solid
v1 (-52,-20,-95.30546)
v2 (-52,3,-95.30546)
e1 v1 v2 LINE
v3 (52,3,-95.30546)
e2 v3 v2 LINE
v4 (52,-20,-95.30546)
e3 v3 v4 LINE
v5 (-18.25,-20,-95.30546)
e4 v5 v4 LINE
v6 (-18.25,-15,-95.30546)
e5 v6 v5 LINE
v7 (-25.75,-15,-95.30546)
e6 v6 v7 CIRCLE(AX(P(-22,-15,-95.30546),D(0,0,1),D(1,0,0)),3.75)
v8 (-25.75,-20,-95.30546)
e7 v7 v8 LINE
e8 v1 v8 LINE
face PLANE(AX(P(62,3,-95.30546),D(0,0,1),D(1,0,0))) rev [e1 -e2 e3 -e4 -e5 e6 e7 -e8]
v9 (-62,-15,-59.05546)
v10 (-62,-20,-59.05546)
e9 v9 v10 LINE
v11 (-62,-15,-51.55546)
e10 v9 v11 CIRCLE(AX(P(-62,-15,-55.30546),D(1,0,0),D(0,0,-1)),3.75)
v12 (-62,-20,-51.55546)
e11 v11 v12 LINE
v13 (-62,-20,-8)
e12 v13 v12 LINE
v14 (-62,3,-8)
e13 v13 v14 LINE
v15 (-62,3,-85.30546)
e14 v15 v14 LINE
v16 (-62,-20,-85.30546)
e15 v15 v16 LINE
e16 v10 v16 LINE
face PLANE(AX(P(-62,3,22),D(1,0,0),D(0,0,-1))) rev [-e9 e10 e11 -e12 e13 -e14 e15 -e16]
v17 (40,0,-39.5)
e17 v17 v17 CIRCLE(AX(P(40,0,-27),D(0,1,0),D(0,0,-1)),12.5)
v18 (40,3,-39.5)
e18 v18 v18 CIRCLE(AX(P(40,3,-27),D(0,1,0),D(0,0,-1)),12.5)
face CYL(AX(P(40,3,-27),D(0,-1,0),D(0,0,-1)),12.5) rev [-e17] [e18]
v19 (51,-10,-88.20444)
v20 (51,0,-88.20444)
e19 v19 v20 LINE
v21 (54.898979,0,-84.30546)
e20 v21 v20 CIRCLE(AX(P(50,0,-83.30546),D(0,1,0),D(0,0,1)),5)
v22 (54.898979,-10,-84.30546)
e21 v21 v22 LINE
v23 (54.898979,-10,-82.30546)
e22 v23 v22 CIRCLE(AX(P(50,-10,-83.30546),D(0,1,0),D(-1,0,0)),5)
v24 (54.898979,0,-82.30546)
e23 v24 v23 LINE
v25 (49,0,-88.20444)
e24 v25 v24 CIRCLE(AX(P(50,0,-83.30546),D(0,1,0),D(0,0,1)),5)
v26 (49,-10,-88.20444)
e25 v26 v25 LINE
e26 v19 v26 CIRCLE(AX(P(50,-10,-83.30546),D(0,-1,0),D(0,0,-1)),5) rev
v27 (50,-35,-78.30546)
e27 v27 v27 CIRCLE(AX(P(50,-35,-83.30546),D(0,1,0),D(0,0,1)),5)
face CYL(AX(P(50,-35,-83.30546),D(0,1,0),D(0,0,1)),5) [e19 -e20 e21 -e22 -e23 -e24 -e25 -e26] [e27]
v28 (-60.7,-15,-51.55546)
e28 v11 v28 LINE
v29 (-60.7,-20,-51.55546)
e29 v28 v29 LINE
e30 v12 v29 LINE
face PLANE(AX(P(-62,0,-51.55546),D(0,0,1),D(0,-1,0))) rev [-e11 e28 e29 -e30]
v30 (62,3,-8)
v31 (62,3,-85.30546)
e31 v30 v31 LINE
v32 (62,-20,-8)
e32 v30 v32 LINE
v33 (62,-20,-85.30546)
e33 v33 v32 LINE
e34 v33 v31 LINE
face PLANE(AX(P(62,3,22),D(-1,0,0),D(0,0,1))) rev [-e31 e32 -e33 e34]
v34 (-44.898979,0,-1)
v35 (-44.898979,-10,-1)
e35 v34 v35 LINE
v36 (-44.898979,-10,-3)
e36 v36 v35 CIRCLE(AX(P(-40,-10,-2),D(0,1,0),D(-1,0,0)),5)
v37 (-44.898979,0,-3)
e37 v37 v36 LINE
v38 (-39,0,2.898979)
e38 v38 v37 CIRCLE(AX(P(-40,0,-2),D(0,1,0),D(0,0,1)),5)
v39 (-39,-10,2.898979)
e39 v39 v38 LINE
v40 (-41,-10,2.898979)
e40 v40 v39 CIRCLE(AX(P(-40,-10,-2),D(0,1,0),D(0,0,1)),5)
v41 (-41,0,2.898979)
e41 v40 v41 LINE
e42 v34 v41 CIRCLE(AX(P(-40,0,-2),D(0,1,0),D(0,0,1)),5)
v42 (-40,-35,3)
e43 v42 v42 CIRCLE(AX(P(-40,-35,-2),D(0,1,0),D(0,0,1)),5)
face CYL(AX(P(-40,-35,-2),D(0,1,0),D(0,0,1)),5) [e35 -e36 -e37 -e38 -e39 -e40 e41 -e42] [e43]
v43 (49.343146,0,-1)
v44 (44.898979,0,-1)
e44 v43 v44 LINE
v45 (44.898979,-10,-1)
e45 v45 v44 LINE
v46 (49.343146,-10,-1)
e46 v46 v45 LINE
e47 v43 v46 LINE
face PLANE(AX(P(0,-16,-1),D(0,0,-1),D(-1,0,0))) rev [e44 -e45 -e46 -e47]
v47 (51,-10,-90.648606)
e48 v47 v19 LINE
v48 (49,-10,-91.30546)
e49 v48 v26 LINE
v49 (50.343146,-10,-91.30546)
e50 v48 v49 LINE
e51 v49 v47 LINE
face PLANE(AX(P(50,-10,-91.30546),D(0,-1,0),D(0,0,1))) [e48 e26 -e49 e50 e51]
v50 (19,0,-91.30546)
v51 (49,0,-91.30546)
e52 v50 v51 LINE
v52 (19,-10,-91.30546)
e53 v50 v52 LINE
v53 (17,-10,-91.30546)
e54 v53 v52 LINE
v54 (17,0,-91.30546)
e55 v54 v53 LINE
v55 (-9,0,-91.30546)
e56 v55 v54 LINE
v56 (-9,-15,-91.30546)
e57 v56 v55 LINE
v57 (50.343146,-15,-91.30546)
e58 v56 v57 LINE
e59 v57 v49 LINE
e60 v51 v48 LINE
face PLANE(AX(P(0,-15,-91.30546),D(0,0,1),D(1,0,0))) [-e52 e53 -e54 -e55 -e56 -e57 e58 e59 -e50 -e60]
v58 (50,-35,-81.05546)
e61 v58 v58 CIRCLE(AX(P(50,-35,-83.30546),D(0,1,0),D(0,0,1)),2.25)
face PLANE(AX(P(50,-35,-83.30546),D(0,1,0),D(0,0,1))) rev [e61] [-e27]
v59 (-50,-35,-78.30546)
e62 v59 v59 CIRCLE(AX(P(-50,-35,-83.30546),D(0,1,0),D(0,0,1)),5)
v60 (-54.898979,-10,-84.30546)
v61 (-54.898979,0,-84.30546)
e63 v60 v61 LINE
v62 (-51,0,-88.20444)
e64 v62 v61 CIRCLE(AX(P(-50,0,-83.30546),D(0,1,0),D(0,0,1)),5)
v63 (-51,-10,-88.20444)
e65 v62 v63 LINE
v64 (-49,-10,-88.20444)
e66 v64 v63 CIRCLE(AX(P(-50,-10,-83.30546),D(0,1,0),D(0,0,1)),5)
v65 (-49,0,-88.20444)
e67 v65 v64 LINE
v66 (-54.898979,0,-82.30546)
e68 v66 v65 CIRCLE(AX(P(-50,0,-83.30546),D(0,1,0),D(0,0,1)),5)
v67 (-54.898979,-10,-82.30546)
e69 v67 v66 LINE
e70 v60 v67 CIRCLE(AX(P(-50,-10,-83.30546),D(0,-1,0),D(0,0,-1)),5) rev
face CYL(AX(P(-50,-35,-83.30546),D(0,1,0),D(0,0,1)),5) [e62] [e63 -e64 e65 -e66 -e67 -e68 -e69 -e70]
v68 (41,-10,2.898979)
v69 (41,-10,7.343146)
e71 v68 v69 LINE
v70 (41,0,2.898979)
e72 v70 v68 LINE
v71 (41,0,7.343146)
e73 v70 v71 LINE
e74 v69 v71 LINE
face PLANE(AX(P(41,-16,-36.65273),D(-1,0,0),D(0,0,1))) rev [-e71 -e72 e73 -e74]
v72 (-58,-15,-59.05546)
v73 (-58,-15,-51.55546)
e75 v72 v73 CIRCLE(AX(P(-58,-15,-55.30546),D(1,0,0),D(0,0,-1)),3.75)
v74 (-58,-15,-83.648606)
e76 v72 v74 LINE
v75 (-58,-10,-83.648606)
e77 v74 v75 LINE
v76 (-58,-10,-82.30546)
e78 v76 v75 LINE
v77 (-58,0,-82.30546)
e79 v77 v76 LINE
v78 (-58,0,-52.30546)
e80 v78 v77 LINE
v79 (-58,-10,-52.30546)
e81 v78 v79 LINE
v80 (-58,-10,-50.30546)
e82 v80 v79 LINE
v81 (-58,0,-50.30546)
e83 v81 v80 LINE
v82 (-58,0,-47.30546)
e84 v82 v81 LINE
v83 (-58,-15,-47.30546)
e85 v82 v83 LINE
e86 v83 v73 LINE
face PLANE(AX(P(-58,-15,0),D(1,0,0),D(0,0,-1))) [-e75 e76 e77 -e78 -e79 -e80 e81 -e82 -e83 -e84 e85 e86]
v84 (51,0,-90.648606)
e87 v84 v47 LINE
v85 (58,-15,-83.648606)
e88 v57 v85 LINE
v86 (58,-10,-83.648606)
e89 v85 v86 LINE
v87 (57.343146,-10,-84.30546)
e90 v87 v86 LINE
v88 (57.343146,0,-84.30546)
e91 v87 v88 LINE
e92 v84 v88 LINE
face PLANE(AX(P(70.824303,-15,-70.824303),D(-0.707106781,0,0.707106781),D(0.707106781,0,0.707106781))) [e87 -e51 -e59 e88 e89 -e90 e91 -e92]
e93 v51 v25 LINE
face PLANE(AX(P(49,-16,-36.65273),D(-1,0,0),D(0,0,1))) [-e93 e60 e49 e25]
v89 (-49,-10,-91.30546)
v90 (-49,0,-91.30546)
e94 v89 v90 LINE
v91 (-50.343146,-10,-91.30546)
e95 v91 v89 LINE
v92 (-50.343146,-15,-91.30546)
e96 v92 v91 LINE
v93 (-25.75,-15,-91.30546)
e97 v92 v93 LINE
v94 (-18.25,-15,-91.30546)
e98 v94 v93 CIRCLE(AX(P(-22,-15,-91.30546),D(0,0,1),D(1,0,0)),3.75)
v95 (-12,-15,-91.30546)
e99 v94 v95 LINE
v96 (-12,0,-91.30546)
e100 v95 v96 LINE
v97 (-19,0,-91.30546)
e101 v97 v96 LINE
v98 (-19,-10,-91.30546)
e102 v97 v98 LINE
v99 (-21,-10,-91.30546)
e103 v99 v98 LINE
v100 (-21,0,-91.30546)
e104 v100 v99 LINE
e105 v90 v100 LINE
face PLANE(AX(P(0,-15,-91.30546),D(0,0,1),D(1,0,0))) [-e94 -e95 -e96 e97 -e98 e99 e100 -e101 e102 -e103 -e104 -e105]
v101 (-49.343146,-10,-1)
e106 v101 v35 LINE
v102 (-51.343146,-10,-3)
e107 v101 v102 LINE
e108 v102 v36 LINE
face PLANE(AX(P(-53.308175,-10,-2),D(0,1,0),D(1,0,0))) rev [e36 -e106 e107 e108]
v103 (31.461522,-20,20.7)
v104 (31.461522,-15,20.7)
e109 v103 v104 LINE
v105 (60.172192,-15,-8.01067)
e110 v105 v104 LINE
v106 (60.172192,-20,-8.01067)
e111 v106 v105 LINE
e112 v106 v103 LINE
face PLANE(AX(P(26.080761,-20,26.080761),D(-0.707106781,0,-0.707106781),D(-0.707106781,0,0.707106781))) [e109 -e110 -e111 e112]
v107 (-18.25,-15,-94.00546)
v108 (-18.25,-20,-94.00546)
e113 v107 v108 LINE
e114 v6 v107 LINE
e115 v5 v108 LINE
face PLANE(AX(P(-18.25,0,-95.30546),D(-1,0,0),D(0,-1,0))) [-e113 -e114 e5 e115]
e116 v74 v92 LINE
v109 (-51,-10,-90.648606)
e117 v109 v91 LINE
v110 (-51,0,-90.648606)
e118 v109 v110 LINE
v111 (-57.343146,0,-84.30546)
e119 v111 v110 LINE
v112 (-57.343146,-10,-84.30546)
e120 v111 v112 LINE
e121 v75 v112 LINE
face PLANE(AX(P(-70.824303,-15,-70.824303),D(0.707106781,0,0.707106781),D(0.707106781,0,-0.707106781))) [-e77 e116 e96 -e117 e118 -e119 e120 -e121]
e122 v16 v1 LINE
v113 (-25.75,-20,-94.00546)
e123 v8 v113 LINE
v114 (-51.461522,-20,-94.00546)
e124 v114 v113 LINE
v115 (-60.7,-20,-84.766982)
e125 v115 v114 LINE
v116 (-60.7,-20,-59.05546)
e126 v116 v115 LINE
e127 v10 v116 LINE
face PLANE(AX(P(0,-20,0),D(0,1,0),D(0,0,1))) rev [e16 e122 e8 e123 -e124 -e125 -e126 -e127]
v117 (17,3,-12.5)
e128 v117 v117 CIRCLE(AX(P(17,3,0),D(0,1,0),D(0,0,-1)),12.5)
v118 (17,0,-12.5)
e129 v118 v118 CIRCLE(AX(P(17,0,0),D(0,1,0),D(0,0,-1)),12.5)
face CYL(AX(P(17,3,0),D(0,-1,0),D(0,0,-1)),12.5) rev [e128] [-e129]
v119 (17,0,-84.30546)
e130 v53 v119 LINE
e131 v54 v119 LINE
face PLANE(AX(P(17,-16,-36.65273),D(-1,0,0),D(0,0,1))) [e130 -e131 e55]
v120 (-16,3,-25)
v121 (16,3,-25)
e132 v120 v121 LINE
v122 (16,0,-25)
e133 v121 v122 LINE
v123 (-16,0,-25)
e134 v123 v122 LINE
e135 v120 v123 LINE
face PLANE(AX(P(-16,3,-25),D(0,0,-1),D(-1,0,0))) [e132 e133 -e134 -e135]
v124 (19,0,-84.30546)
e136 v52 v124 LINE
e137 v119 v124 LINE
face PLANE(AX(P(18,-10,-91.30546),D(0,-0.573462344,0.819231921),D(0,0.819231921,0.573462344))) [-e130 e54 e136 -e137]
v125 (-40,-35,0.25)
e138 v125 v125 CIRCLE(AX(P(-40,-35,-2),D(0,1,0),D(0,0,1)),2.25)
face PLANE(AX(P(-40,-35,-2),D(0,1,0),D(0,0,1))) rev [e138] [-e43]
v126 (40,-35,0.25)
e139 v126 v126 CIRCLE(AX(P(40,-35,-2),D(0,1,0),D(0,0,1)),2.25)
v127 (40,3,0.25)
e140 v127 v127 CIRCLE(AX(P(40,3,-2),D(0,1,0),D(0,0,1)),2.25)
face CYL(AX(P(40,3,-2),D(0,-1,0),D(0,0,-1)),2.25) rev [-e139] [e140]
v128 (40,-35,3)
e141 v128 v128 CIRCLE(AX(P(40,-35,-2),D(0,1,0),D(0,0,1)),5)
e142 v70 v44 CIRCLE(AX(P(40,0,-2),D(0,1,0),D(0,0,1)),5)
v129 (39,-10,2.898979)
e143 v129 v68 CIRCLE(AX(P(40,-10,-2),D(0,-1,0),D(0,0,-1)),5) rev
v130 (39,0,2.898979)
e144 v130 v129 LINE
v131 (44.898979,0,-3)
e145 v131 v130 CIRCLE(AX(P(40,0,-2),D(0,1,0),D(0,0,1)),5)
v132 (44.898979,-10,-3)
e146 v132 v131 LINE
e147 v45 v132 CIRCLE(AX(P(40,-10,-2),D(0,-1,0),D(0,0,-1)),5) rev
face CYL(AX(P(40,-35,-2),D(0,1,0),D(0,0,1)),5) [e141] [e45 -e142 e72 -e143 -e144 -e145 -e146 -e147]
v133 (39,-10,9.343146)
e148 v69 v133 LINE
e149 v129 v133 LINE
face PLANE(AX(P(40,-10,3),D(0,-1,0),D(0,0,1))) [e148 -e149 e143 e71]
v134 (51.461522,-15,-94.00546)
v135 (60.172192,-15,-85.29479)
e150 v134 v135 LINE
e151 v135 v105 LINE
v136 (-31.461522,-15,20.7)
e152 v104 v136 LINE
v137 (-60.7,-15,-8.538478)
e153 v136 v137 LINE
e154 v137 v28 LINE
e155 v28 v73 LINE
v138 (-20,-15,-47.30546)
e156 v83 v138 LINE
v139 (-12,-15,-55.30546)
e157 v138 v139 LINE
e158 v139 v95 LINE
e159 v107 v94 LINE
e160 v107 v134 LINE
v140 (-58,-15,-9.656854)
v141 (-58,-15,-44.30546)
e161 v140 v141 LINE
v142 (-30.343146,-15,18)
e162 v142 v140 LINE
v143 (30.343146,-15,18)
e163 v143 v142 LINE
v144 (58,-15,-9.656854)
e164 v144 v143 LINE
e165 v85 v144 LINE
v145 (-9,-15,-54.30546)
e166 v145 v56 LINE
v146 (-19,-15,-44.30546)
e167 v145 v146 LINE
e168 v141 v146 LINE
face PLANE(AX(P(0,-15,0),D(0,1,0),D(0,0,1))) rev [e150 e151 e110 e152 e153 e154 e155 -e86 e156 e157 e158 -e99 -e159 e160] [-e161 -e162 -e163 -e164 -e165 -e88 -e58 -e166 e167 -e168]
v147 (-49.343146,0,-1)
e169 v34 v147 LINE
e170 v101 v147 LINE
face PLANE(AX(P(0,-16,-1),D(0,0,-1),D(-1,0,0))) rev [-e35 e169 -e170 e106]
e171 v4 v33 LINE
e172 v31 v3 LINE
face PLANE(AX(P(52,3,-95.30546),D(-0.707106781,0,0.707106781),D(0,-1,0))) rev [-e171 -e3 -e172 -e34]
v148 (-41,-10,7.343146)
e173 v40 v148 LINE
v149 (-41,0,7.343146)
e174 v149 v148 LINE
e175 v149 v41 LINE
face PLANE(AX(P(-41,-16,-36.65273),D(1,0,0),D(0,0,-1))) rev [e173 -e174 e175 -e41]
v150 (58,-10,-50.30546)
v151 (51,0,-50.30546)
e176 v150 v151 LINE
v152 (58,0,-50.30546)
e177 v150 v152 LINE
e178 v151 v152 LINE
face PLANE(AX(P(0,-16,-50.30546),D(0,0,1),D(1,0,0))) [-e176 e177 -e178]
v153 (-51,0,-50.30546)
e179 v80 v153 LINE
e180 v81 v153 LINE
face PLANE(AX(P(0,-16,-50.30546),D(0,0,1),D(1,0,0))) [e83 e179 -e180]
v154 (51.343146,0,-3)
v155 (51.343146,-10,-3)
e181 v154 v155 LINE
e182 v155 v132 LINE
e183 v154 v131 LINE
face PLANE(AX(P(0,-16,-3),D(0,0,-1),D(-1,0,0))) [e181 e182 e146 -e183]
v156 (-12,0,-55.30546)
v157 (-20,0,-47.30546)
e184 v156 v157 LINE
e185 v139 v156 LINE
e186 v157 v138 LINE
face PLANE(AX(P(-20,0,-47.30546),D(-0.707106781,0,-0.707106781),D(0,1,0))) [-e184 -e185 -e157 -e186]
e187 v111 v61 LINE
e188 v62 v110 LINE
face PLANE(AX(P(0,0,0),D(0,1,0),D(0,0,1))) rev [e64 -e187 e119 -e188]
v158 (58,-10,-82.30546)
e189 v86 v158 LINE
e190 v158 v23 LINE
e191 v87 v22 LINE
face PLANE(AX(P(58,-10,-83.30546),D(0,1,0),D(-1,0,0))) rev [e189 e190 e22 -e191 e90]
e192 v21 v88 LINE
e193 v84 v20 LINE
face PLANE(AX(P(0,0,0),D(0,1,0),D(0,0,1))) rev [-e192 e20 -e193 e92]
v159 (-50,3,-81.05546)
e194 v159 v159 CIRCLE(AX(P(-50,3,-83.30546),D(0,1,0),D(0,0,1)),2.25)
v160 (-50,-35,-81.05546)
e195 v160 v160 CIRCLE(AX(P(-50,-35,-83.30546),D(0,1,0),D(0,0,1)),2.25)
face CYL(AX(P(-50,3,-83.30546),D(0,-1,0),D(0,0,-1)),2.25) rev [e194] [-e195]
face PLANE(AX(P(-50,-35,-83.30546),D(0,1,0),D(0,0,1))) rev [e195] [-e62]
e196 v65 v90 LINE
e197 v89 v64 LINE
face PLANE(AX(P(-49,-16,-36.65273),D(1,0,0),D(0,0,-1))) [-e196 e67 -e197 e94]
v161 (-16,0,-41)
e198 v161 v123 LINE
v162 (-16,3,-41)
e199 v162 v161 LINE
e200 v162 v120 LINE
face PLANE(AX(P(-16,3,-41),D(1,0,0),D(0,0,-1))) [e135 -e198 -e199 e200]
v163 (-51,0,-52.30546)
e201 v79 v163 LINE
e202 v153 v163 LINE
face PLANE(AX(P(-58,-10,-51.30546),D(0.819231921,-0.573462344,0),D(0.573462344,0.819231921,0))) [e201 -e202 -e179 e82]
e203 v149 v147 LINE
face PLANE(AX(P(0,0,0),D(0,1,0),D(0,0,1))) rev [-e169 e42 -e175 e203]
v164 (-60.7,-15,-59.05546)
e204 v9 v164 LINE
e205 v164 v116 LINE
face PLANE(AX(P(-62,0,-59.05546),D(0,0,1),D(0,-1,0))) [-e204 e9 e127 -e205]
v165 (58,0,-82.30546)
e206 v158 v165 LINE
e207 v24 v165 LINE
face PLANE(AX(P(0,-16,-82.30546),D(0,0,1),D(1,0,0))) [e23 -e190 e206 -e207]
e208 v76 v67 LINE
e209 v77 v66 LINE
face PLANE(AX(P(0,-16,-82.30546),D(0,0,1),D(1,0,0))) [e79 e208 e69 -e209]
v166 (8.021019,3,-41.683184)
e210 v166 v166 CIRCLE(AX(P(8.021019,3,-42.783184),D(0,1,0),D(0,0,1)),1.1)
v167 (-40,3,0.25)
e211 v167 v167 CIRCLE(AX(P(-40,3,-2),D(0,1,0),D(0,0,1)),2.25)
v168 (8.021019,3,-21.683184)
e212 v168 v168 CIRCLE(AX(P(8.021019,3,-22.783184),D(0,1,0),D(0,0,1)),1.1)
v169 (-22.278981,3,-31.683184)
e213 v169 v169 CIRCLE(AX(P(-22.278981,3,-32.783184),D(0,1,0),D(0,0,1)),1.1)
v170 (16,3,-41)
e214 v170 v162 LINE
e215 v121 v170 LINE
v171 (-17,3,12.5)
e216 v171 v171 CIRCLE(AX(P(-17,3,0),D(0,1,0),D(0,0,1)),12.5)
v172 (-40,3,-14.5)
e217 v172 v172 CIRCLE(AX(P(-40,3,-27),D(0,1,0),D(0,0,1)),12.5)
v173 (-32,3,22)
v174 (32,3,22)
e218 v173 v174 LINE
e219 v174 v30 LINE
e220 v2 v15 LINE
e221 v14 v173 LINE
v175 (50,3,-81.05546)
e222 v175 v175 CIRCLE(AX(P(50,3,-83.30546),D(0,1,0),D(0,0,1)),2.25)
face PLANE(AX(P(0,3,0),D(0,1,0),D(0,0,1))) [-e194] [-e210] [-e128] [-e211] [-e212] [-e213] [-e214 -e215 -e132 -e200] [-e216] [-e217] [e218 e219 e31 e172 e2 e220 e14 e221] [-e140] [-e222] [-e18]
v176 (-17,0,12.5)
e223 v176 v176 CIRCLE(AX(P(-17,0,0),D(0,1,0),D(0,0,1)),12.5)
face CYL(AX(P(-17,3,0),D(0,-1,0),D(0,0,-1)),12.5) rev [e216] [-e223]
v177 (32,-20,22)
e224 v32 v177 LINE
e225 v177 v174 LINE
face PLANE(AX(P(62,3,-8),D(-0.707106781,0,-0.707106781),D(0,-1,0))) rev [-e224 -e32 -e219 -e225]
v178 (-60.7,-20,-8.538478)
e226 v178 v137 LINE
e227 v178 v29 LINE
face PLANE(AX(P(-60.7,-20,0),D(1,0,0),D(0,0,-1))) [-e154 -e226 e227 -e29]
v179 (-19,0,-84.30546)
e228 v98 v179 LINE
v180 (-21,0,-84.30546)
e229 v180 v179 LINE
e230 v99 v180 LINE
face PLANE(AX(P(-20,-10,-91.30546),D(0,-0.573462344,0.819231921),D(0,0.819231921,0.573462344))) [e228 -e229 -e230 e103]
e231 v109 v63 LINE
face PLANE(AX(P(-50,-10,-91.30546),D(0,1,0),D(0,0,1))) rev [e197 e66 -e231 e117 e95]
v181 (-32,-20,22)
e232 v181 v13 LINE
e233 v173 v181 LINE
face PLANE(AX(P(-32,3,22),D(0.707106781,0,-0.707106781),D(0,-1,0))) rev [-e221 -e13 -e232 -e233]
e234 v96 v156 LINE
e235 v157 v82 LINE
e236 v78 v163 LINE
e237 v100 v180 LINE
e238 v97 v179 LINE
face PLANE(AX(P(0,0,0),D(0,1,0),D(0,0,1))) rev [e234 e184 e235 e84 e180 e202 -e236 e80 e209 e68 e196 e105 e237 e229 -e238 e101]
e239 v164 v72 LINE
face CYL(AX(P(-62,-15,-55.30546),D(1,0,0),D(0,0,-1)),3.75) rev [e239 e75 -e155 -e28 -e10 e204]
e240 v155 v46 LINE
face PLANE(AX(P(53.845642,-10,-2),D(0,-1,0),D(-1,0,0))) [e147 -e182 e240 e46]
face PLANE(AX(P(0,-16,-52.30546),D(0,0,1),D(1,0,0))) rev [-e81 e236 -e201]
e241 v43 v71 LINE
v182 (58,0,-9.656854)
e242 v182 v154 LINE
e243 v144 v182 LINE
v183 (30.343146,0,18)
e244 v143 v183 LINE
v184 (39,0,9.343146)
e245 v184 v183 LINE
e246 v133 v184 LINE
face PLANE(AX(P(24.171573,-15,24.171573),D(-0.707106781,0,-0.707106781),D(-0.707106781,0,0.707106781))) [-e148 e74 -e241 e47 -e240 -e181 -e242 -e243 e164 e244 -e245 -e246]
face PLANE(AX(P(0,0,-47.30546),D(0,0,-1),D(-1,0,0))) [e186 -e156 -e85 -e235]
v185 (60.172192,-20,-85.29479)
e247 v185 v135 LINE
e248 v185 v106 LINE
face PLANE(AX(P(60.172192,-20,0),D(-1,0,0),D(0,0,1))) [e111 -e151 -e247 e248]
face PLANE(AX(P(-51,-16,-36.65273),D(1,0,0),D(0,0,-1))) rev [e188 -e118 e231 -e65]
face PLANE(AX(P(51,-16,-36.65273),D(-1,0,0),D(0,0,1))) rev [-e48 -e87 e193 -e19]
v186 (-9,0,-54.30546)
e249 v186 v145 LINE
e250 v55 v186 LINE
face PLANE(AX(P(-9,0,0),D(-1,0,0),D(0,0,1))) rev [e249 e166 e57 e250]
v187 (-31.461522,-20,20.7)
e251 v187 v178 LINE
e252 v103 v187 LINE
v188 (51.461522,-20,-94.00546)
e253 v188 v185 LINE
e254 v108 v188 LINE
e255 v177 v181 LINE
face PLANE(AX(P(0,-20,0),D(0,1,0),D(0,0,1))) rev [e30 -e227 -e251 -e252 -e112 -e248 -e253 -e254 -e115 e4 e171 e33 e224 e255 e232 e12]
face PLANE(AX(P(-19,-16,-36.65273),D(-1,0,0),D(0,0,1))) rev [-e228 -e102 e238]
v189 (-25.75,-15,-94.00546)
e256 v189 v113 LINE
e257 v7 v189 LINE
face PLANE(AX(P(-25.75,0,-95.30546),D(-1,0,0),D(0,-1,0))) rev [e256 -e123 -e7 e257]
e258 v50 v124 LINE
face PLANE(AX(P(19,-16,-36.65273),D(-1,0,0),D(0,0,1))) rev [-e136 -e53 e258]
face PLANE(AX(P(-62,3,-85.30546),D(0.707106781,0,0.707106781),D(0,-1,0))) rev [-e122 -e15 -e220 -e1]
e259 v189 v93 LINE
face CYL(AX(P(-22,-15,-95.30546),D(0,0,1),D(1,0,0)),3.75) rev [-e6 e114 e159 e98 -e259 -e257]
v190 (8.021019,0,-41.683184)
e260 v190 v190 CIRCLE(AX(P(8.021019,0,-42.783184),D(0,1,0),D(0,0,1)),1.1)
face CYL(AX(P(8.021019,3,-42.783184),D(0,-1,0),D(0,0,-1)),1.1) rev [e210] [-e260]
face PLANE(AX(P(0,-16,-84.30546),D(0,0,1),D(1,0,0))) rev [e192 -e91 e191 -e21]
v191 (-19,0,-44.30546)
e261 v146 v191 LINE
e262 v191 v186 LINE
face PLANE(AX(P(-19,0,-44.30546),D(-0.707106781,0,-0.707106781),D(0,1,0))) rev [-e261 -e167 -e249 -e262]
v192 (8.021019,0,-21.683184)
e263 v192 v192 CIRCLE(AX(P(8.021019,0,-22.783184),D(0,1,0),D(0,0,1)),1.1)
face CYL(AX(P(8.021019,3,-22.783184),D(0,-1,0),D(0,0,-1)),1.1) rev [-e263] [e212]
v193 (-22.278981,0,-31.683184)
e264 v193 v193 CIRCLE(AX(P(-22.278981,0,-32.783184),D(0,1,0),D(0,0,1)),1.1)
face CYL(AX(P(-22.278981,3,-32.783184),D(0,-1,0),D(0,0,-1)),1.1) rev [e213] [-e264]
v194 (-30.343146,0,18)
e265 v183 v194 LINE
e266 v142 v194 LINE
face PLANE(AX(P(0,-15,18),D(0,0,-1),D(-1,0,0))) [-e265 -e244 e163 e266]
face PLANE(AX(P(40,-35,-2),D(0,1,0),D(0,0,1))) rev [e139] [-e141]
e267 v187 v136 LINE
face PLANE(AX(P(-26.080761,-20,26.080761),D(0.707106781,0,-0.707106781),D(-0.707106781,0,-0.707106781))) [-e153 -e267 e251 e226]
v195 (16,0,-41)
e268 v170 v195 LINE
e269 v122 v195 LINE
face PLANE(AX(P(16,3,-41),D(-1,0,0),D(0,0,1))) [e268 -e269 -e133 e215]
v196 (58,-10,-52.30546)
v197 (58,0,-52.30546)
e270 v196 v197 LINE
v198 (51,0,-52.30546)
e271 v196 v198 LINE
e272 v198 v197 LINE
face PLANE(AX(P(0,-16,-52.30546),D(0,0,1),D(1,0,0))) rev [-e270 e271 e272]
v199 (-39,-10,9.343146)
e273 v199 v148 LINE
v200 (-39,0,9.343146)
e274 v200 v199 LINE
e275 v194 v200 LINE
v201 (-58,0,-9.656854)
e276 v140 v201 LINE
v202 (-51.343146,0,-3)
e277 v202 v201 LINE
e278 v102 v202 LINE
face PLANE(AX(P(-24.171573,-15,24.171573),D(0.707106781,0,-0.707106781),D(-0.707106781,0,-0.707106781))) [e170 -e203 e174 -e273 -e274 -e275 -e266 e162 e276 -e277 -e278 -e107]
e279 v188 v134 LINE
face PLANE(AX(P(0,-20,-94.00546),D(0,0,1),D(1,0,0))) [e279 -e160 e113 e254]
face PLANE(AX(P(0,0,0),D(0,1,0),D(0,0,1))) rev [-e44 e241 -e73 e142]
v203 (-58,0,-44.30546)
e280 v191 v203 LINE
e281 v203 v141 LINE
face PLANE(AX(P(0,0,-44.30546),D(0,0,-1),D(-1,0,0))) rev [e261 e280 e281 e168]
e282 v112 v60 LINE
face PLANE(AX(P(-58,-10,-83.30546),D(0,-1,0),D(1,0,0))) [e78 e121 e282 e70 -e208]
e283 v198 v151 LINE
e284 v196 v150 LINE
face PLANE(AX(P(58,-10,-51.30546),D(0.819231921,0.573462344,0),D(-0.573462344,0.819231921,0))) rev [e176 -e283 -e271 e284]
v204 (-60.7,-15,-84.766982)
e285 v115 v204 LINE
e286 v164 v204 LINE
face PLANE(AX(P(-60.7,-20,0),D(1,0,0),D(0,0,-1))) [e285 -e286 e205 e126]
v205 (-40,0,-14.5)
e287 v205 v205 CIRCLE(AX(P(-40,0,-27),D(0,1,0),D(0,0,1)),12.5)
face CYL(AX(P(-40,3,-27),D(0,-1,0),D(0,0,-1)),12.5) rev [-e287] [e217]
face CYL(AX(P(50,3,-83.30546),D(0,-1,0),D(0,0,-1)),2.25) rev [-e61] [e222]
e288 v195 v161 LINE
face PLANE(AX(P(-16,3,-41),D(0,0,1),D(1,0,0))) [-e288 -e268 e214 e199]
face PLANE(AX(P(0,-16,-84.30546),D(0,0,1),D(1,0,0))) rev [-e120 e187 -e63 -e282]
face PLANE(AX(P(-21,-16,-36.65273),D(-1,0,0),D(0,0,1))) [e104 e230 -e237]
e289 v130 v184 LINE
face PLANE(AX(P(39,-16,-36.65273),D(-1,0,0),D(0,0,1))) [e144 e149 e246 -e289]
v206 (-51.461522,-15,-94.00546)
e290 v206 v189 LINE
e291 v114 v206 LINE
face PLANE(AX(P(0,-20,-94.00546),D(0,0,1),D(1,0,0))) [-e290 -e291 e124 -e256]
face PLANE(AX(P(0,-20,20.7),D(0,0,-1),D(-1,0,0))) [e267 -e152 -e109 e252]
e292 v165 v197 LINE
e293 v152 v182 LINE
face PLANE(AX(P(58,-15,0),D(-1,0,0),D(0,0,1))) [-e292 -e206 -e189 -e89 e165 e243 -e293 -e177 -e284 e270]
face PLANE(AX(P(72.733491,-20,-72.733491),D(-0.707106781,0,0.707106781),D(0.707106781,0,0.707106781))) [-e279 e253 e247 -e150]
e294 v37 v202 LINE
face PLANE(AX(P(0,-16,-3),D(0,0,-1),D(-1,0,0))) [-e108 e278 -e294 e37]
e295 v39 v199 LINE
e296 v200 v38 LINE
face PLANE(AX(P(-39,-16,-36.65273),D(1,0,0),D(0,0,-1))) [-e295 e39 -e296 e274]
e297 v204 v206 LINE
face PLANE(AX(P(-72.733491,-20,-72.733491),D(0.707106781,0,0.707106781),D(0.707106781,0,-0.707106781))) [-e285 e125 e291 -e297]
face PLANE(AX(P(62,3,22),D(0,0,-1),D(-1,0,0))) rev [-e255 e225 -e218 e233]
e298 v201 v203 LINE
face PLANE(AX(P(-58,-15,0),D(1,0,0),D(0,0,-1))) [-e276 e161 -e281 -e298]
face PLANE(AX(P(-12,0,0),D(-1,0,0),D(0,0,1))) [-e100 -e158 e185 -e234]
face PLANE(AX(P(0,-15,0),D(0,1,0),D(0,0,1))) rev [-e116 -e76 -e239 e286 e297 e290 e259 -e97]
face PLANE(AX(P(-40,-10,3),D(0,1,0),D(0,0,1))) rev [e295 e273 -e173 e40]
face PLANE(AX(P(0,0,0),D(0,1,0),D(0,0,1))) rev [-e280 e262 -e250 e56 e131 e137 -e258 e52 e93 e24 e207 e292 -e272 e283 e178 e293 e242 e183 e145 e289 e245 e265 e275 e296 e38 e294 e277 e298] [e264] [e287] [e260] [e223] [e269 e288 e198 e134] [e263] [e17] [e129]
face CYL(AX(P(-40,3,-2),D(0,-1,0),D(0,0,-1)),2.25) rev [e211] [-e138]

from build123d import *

# Parameters (mm, degrees)
ESQUISSE1_W             = 124
ESQUISSE1_H             = 117.305460094
ESQUISSE1_R             = 12.5
ESQUISSE1_W_2           = 32
ESQUISSE1_H_2           = 16
BOSS_EXTRU_1_DEPTH      = 3
ESQUISSE3_R             = 1.1
ENL_V_MAT_EXTRU_1_DEPTH = 114.737112341
CHANFREIN1_SIZE         = 30
CHANFREIN2_SIZE         = 10
ESQUISSE4_R             = 2.25
ENL_V_MAT_EXTRU_2_DEPTH = 114.737112341
BOSS_EXTRU_2_START      = -35
ESQUISSE4_3_R           = 5
ESQUISSE4_3_R_2         = 2.25
BOSS_EXTRU_2_DEPTH      = 35
BOSS_EXTRU_3_DEPTH      = 20
BOSS_EXTRU_4_DEPTH      = 15
ENL_V_MAT_EXTRU_4_DEPTH = 119.962728296
ENL_V_MAT_EXTRU_6_DEPTH = 119.962728296
NERVURE1_REACH          = 131.26
ESQUISSE8_WALL_W        = 272.726425054
ESQUISSE8_WALL_H        = 2
NERVURE2_REACH          = 132.507
ESQUISSE9_WALL_W        = 275.220966894
ESQUISSE9_WALL_H        = 2
NERVURE3_REACH          = 104.189
ESQUISSE10_WALL_W       = 218.585522044
ESQUISSE10_WALL_H       = 2
NERVURE4_REACH          = 104.189
ESQUISSE11_WALL_W       = 218.585522044
ESQUISSE11_WALL_H       = 2
NERVURE5_REACH          = 153.169
ESQUISSE12_WALL_W       = 307.338424442
ESQUISSE12_WALL_H       = 2
NERVURE6_REACH          = 129.115
ESQUISSE13_WALL_W       = 259.230131382
ESQUISSE13_WALL_H       = 2
NERVURE7_REACH          = 129.115
ESQUISSE14_WALL_W       = 259.230131382
ESQUISSE14_WALL_H       = 2
NERVURE8_REACH          = 153.169
ESQUISSE15_WALL_W       = 307.338424442
ESQUISSE15_WALL_H       = 2
NERVURE9_REACH          = 119.367
ESQUISSE16_WALL_W       = 245.04129034
ESQUISSE16_WALL_H       = 2
NERVURE11_REACH         = 119.367
ESQUISSE17_WALL_W       = 245.578757666
ESQUISSE17_WALL_H       = 2
NERVURE12_REACH         = 145.917
ESQUISSE18_WALL_W       = 295.356537138
ESQUISSE18_WALL_H       = 2
NERVURE13_REACH         = 145.917
ESQUISSE19_WALL_W       = 296.177339158
ESQUISSE19_WALL_H       = 2
BOSS_EXTRU_5_DEPTH      = 2
BOSS_EXTRU_5_DEPTH_BACK = 1
ESQUISSE20_W            = 45
ESQUISSE20_H            = 15
BOSS_EXTRU_6_DEPTH      = 2
BOSS_EXTRU_6_DEPTH_BACK = 1
ESQUISSE21_W            = 49
ESQUISSE21_H            = 15
CHANFREIN3_SIZE         = 8
CHANFREIN4_SIZE         = 10


with BuildPart() as part:
    # Esquisse1 → Boss.-Extru.1 (new body)
    with BuildSketch(Plane(origin=(0, 0, 0), x_dir=(1, 0, 0), z_dir=(0, 1, 0))):
        with Locations((0, 36.652730047)):
            Rectangle(ESQUISSE1_W, ESQUISSE1_H)
        with Locations((-40, 27)):
            Circle(ESQUISSE1_R, mode=Mode.SUBTRACT)
        with Locations((-17, 0)):
            Circle(ESQUISSE1_R, mode=Mode.SUBTRACT)
        with Locations((17, 0)):
            Circle(ESQUISSE1_R, mode=Mode.SUBTRACT)
        with Locations((40, 27)):
            Circle(ESQUISSE1_R, mode=Mode.SUBTRACT)
        with Locations((0, 33)):
            Rectangle(ESQUISSE1_W_2, ESQUISSE1_H_2, mode=Mode.SUBTRACT)
    extrude(amount=BOSS_EXTRU_1_DEPTH)

    # Esquisse3 → Enlèv. mat.-Extru.1 (cut, through all)
    with BuildSketch(Plane(origin=(0, 0, 0), x_dir=(1, 0, 0), z_dir=(0, 1, 0))):
        with Locations((8.021018959, 22.783184136)):
            Circle(ESQUISSE3_R)
        with Locations((-22.278981041, 32.783184136)):
            Circle(ESQUISSE3_R)
        with Locations((8.021018959, 42.783184136)):
            Circle(ESQUISSE3_R)
    extrude(amount=ENL_V_MAT_EXTRU_1_DEPTH, mode=Mode.SUBTRACT)

    # Chanfrein1
    chanfrein1_edges = [part.edges().sort_by_distance(p)[0] for p in [
        (-62, 1.5, 22),
        (62, 1.5, 22),
    ]]
    chamfer(chanfrein1_edges, length=CHANFREIN1_SIZE)

    # Chanfrein2
    chanfrein2_edges = [part.edges().sort_by_distance(p)[0] for p in [
        (62, 1.5, -95.305460094),
        (-62, 1.5, -95.305460094),
    ]]
    chamfer(chanfrein2_edges, length=CHANFREIN2_SIZE)

    # Esquisse4 → Enlèv. mat.-Extru.2 (cut, through all)
    with BuildSketch(Plane(origin=(0, 0, 0), x_dir=(1, 0, 0), z_dir=(0, 1, 0))):
        with Locations((-40, 2)):
            Circle(ESQUISSE4_R)
        with Locations((40, 2)):
            Circle(ESQUISSE4_R)
        with Locations((50, 83.305460094)):
            Circle(ESQUISSE4_R)
        with Locations((-50, 83.305460094)):
            Circle(ESQUISSE4_R)
    extrude(amount=ENL_V_MAT_EXTRU_2_DEPTH, mode=Mode.SUBTRACT)

    # Esquisse4<3> → Boss.-Extru.2 (add)
    # profile 1 of 4: a face of its own
    with BuildSketch(Plane(origin=(0, 0, 0), x_dir=(1, 0, 0), z_dir=(0, 1, 0)).offset(BOSS_EXTRU_2_START)):
        with Locations((-40, 2)):
            Circle(ESQUISSE4_3_R)
        with Locations((-40, 2)):
            Circle(ESQUISSE4_3_R_2, mode=Mode.SUBTRACT)
    # profile 2 of 4: a face of its own
    with BuildSketch(Plane(origin=(0, 0, 0), x_dir=(1, 0, 0), z_dir=(0, 1, 0)).offset(BOSS_EXTRU_2_START)):
        with Locations((40, 2)):
            Circle(ESQUISSE4_3_R)
        with Locations((40, 2)):
            Circle(ESQUISSE4_3_R_2, mode=Mode.SUBTRACT)
    # profile 3 of 4: a face of its own
    with BuildSketch(Plane(origin=(0, 0, 0), x_dir=(1, 0, 0), z_dir=(0, 1, 0)).offset(BOSS_EXTRU_2_START)):
        with Locations((50, 83.305460094)):
            Circle(ESQUISSE4_3_R)
        with Locations((50, 83.305460094)):
            Circle(ESQUISSE4_3_R_2, mode=Mode.SUBTRACT)
    # profile 4 of 4: a face of its own
    with BuildSketch(Plane(origin=(0, 0, 0), x_dir=(1, 0, 0), z_dir=(0, 1, 0)).offset(BOSS_EXTRU_2_START)):
        with Locations((-50, 83.305460094)):
            Circle(ESQUISSE4_3_R)
        with Locations((-50, 83.305460094)):
            Circle(ESQUISSE4_3_R_2, mode=Mode.SUBTRACT)
    extrude(amount=BOSS_EXTRU_2_DEPTH)

    # Esquisse5 → Boss.-Extru.3 (add)
    with BuildSketch(Plane(origin=(0, 0, 0), x_dir=(1, 0, 0), z_dir=(0, 1, 0))):
        Polygon((-52, 95.305460094), (-62, 85.305460094), (-62, 8), (-32, -22), (32, -22), (62, 8), (62, 85.305460094), (52, 95.305460094), align=None)
        Polygon((-60.7, 8.538477631), (-60.7, 84.766982462), (-51.461522369, 94.005460094), (51.461522369, 94.005460094), (60.172192098, 85.294790364), (60.172192098, 8.010669729), (31.461522369, -20.7), (-31.461522369, -20.7), align=None, mode=Mode.SUBTRACT)
    extrude(amount=-BOSS_EXTRU_3_DEPTH)

    # Esquisse5<3> → Boss.-Extru.4 (add)
    with BuildSketch(Plane(origin=(0, 0, 0), x_dir=(1, 0, 0), z_dir=(0, 1, 0))):
        Polygon((-51.461522369, 94.005460094), (-60.7, 84.766982462), (-60.7, 8.538477631), (-31.461522369, -20.7), (31.461522369, -20.7), (60.172192098, 8.010669729), (60.172192098, 85.294790364), (51.461522369, 94.005460094), align=None)
        Polygon((-58, 9.656854249), (-58, 83.648605844), (-50.343145751, 91.305460094), (50.343145751, 91.305460094), (58, 83.648605844), (58, 9.656854249), (30.343145751, -18), (-30.343145751, -18), align=None, mode=Mode.SUBTRACT)
    extrude(amount=-BOSS_EXTRU_4_DEPTH)

    # Esquisse6 → Enlèv. mat.-Extru.4 (cut, through all)
    with BuildSketch(Plane(origin=(0, 0, 0), x_dir=(0, 0, -1), z_dir=(1, 0, 0))):
        with BuildLine():
            Line((51.555460094, -20), (59.055460094, -20))
            Line((59.055460094, -20), (59.055460094, -15))
            ThreePointArc((59.055460094, -15), (55.305460094, -11.25), (51.555460094, -15))
            Line((51.555460094, -15), (51.555460094, -20))
        make_face()
    extrude(amount=-ENL_V_MAT_EXTRU_4_DEPTH, mode=Mode.SUBTRACT)

    # Esquisse7 → Enlèv. mat.-Extru.6 (cut, through all)
    with BuildSketch(Plane.XY):
        with BuildLine():
            ThreePointArc((-18.25, -15), (-22, -11.25), (-25.75, -15))
            Line((-25.75, -15), (-25.75, -20))
            Line((-25.75, -20), (-18.25, -20))
            Line((-18.25, -20), (-18.25, -15))
        make_face()
    extrude(amount=-ENL_V_MAT_EXTRU_6_DEPTH, mode=Mode.SUBTRACT)

    # Esquisse8 wall → Nervure1 (add, up to next)
    with BuildSketch(Plane(origin=(18, -5, -87.805460094), x_dir=(0, 0.819231920519, 0.573462344363), z_dir=(0, 0.573462344363, -0.819231920519)), mode=Mode.PRIVATE) as nervure1_sk1:
        Rectangle(ESQUISSE8_WALL_W, ESQUISSE8_WALL_H)
    nervure1_tool1 = extrude(nervure1_sk1.sketch, amount=NERVURE1_REACH, mode=Mode.PRIVATE) - part.part
    add(nervure1_tool1.solids().sort_by_distance((18, -5, -87.805460094))[0])

    # Esquisse9 wall → Nervure2 (add, up to next)
    with BuildSketch(Plane(origin=(-20, -5, -87.805460094), x_dir=(0, 0.819231920519, 0.573462344363), z_dir=(0, 0.573462344363, -0.819231920519)), mode=Mode.PRIVATE) as nervure2_sk1:
        Rectangle(ESQUISSE9_WALL_W, ESQUISSE9_WALL_H)
    nervure2_tool1 = extrude(nervure2_sk1.sketch, amount=NERVURE2_REACH, mode=Mode.PRIVATE) - part.part
    add(nervure2_tool1.solids().sort_by_distance((-20, -5, -87.805460094))[0])

    # Esquisse10 wall → Nervure3 (add, up to next)
    with BuildSketch(Plane(origin=(54.5, -5, -51.305460094), x_dir=(-0.573462344363, 0.819231920519, 0), z_dir=(-0.819231920519, -0.573462344363, 0)), mode=Mode.PRIVATE) as nervure3_sk1:
        Rectangle(ESQUISSE10_WALL_W, ESQUISSE10_WALL_H)
    nervure3_tool1 = extrude(nervure3_sk1.sketch, amount=-NERVURE3_REACH, mode=Mode.PRIVATE) - part.part
    add(nervure3_tool1.solids().sort_by_distance((54.5, -5, -51.305460094))[0])

    # Esquisse11 wall → Nervure4 (add, up to next)
    with BuildSketch(Plane(origin=(-54.5, -5, -51.305460094), x_dir=(0.573462344363, 0.819231920519, 0), z_dir=(-0.819231920519, 0.573462344363, 0)), mode=Mode.PRIVATE) as nervure4_sk1:
        Rectangle(ESQUISSE11_WALL_W, ESQUISSE11_WALL_H)
    nervure4_tool1 = extrude(nervure4_sk1.sketch, amount=NERVURE4_REACH, mode=Mode.PRIVATE) - part.part
    add(nervure4_tool1.solids().sort_by_distance((-54.5, -5, -51.305460094))[0])

    # Esquisse12 wall → Nervure5 (add, up to next)
    with BuildSketch(Plane(origin=(50, -10, -89.805460094), x_dir=(0, 0, 1), z_dir=(0, 1, 0)), mode=Mode.PRIVATE) as nervure5_sk1:
        Rectangle(ESQUISSE12_WALL_W, ESQUISSE12_WALL_H)
    nervure5_tool1 = extrude(nervure5_sk1.sketch, amount=NERVURE5_REACH, mode=Mode.PRIVATE) - part.part
    add(nervure5_tool1.solids().sort_by_distance((50, -10, -89.805460094))[0])

    # Esquisse13 wall → Nervure6 (add, up to next)
    with BuildSketch(Plane(origin=(56.5, -10, -83.305460094), x_dir=(-1, 0, 0), z_dir=(0, -1, 0)), mode=Mode.PRIVATE) as nervure6_sk1:
        Rectangle(ESQUISSE13_WALL_W, ESQUISSE13_WALL_H)
    nervure6_tool1 = extrude(nervure6_sk1.sketch, amount=-NERVURE6_REACH, mode=Mode.PRIVATE) - part.part
    add(nervure6_tool1.solids().sort_by_distance((56.5, -10, -83.305460094))[0])

    # Esquisse14 wall → Nervure7 (add, up to next)
    with BuildSketch(Plane(origin=(-56.5, -10, -83.305460094), x_dir=(1, 0, 0), z_dir=(0, 1, 0)), mode=Mode.PRIVATE) as nervure7_sk1:
        Rectangle(ESQUISSE14_WALL_W, ESQUISSE14_WALL_H)
    nervure7_tool1 = extrude(nervure7_sk1.sketch, amount=NERVURE7_REACH, mode=Mode.PRIVATE) - part.part
    add(nervure7_tool1.solids().sort_by_distance((-56.5, -10, -83.305460094))[0])

    # Esquisse15 wall → Nervure8 (add, up to next)
    with BuildSketch(Plane(origin=(-50, -10, -89.805460094), x_dir=(0, 0, 1), z_dir=(0, -1, 0)), mode=Mode.PRIVATE) as nervure8_sk1:
        Rectangle(ESQUISSE15_WALL_W, ESQUISSE15_WALL_H)
    nervure8_tool1 = extrude(nervure8_sk1.sketch, amount=-NERVURE8_REACH, mode=Mode.PRIVATE) - part.part
    add(nervure8_tool1.solids().sort_by_distance((-50, -10, -89.805460094))[0])

    # Esquisse16 wall → Nervure9 (add, up to next)
    with BuildSketch(Plane(origin=(-49.154087398, -10, -2), x_dir=(1, 0, 0), z_dir=(0, -1, 0)), mode=Mode.PRIVATE) as nervure9_sk1:
        Rectangle(ESQUISSE16_WALL_W, ESQUISSE16_WALL_H)
    nervure9_tool1 = extrude(nervure9_sk1.sketch, amount=-NERVURE9_REACH, mode=Mode.PRIVATE) - part.part
    add(nervure9_tool1.solids().sort_by_distance((-49.154087398, -10, -2))[0])

    # Esquisse17 wall → Nervure11 (add, up to next)
    with BuildSketch(Plane(origin=(49.42282106, -10, -2), x_dir=(-1, 0, 0), z_dir=(0, 1, 0)), mode=Mode.PRIVATE) as nervure11_sk1:
        Rectangle(ESQUISSE17_WALL_W, ESQUISSE17_WALL_H)
    nervure11_tool1 = extrude(nervure11_sk1.sketch, amount=NERVURE11_REACH, mode=Mode.PRIVATE) - part.part
    add(nervure11_tool1.solids().sort_by_distance((49.42282106, -10, -2))[0])

    # Esquisse18 wall → Nervure12 (add, up to next)
    with BuildSketch(Plane(origin=(40, -10, 5.761171865), x_dir=(0, 0, 1), z_dir=(0, 1, 0)), mode=Mode.PRIVATE) as nervure12_sk1:
        Rectangle(ESQUISSE18_WALL_W, ESQUISSE18_WALL_H)
    nervure12_tool1 = extrude(nervure12_sk1.sketch, amount=NERVURE12_REACH, mode=Mode.PRIVATE) - part.part
    add(nervure12_tool1.solids().sort_by_distance((40, -10, 5.761171865))[0])

    # Esquisse19 wall → Nervure13 (add, up to next)
    with BuildSketch(Plane(origin=(-40, -10, 6.171572875), x_dir=(0, 0, 1), z_dir=(0, -1, 0)), mode=Mode.PRIVATE) as nervure13_sk1:
        Rectangle(ESQUISSE19_WALL_W, ESQUISSE19_WALL_H)
    nervure13_tool1 = extrude(nervure13_sk1.sketch, amount=-NERVURE13_REACH, mode=Mode.PRIVATE) - part.part
    add(nervure13_tool1.solids().sort_by_distance((-40, -10, 6.171572875))[0])

    # Esquisse20 → Boss.-Extru.5 (add, two sides: drawn at the far end of the back side and taken through both)
    with BuildSketch(Plane(origin=(-11, 0, 0), x_dir=(0, 0, -1), z_dir=(1, 0, 0)).offset(-BOSS_EXTRU_5_DEPTH_BACK)):
        with Locations((68.805460094, -7.5)):
            Rectangle(ESQUISSE20_W, ESQUISSE20_H)
    extrude(amount=BOSS_EXTRU_5_DEPTH + BOSS_EXTRU_5_DEPTH_BACK)

    # Esquisse21 → Boss.-Extru.6 (add, two sides: drawn at the far end of the back side and taken through both)
    with BuildSketch(Plane.XY.offset(-46.305460094).offset(-BOSS_EXTRU_6_DEPTH_BACK)):
        with Locations((-33.5, -7.5)):
            Rectangle(ESQUISSE21_W, ESQUISSE21_H)
    extrude(amount=BOSS_EXTRU_6_DEPTH + BOSS_EXTRU_6_DEPTH_BACK)

    # Chanfrein3
    chanfrein3_edges = [part.edges().sort_by_distance(p)[0] for p in [
        (-12, -7.5, -47.305460094),
    ]]
    chamfer(chanfrein3_edges, length=CHANFREIN3_SIZE)

    # Chanfrein4
    chanfrein4_edges = [part.edges().sort_by_distance(p)[0] for p in [
        (-9, -7.5, -44.305460094),
    ]]
    chamfer(chanfrein4_edges, length=CHANFREIN4_SIZE)


solid = part.part
